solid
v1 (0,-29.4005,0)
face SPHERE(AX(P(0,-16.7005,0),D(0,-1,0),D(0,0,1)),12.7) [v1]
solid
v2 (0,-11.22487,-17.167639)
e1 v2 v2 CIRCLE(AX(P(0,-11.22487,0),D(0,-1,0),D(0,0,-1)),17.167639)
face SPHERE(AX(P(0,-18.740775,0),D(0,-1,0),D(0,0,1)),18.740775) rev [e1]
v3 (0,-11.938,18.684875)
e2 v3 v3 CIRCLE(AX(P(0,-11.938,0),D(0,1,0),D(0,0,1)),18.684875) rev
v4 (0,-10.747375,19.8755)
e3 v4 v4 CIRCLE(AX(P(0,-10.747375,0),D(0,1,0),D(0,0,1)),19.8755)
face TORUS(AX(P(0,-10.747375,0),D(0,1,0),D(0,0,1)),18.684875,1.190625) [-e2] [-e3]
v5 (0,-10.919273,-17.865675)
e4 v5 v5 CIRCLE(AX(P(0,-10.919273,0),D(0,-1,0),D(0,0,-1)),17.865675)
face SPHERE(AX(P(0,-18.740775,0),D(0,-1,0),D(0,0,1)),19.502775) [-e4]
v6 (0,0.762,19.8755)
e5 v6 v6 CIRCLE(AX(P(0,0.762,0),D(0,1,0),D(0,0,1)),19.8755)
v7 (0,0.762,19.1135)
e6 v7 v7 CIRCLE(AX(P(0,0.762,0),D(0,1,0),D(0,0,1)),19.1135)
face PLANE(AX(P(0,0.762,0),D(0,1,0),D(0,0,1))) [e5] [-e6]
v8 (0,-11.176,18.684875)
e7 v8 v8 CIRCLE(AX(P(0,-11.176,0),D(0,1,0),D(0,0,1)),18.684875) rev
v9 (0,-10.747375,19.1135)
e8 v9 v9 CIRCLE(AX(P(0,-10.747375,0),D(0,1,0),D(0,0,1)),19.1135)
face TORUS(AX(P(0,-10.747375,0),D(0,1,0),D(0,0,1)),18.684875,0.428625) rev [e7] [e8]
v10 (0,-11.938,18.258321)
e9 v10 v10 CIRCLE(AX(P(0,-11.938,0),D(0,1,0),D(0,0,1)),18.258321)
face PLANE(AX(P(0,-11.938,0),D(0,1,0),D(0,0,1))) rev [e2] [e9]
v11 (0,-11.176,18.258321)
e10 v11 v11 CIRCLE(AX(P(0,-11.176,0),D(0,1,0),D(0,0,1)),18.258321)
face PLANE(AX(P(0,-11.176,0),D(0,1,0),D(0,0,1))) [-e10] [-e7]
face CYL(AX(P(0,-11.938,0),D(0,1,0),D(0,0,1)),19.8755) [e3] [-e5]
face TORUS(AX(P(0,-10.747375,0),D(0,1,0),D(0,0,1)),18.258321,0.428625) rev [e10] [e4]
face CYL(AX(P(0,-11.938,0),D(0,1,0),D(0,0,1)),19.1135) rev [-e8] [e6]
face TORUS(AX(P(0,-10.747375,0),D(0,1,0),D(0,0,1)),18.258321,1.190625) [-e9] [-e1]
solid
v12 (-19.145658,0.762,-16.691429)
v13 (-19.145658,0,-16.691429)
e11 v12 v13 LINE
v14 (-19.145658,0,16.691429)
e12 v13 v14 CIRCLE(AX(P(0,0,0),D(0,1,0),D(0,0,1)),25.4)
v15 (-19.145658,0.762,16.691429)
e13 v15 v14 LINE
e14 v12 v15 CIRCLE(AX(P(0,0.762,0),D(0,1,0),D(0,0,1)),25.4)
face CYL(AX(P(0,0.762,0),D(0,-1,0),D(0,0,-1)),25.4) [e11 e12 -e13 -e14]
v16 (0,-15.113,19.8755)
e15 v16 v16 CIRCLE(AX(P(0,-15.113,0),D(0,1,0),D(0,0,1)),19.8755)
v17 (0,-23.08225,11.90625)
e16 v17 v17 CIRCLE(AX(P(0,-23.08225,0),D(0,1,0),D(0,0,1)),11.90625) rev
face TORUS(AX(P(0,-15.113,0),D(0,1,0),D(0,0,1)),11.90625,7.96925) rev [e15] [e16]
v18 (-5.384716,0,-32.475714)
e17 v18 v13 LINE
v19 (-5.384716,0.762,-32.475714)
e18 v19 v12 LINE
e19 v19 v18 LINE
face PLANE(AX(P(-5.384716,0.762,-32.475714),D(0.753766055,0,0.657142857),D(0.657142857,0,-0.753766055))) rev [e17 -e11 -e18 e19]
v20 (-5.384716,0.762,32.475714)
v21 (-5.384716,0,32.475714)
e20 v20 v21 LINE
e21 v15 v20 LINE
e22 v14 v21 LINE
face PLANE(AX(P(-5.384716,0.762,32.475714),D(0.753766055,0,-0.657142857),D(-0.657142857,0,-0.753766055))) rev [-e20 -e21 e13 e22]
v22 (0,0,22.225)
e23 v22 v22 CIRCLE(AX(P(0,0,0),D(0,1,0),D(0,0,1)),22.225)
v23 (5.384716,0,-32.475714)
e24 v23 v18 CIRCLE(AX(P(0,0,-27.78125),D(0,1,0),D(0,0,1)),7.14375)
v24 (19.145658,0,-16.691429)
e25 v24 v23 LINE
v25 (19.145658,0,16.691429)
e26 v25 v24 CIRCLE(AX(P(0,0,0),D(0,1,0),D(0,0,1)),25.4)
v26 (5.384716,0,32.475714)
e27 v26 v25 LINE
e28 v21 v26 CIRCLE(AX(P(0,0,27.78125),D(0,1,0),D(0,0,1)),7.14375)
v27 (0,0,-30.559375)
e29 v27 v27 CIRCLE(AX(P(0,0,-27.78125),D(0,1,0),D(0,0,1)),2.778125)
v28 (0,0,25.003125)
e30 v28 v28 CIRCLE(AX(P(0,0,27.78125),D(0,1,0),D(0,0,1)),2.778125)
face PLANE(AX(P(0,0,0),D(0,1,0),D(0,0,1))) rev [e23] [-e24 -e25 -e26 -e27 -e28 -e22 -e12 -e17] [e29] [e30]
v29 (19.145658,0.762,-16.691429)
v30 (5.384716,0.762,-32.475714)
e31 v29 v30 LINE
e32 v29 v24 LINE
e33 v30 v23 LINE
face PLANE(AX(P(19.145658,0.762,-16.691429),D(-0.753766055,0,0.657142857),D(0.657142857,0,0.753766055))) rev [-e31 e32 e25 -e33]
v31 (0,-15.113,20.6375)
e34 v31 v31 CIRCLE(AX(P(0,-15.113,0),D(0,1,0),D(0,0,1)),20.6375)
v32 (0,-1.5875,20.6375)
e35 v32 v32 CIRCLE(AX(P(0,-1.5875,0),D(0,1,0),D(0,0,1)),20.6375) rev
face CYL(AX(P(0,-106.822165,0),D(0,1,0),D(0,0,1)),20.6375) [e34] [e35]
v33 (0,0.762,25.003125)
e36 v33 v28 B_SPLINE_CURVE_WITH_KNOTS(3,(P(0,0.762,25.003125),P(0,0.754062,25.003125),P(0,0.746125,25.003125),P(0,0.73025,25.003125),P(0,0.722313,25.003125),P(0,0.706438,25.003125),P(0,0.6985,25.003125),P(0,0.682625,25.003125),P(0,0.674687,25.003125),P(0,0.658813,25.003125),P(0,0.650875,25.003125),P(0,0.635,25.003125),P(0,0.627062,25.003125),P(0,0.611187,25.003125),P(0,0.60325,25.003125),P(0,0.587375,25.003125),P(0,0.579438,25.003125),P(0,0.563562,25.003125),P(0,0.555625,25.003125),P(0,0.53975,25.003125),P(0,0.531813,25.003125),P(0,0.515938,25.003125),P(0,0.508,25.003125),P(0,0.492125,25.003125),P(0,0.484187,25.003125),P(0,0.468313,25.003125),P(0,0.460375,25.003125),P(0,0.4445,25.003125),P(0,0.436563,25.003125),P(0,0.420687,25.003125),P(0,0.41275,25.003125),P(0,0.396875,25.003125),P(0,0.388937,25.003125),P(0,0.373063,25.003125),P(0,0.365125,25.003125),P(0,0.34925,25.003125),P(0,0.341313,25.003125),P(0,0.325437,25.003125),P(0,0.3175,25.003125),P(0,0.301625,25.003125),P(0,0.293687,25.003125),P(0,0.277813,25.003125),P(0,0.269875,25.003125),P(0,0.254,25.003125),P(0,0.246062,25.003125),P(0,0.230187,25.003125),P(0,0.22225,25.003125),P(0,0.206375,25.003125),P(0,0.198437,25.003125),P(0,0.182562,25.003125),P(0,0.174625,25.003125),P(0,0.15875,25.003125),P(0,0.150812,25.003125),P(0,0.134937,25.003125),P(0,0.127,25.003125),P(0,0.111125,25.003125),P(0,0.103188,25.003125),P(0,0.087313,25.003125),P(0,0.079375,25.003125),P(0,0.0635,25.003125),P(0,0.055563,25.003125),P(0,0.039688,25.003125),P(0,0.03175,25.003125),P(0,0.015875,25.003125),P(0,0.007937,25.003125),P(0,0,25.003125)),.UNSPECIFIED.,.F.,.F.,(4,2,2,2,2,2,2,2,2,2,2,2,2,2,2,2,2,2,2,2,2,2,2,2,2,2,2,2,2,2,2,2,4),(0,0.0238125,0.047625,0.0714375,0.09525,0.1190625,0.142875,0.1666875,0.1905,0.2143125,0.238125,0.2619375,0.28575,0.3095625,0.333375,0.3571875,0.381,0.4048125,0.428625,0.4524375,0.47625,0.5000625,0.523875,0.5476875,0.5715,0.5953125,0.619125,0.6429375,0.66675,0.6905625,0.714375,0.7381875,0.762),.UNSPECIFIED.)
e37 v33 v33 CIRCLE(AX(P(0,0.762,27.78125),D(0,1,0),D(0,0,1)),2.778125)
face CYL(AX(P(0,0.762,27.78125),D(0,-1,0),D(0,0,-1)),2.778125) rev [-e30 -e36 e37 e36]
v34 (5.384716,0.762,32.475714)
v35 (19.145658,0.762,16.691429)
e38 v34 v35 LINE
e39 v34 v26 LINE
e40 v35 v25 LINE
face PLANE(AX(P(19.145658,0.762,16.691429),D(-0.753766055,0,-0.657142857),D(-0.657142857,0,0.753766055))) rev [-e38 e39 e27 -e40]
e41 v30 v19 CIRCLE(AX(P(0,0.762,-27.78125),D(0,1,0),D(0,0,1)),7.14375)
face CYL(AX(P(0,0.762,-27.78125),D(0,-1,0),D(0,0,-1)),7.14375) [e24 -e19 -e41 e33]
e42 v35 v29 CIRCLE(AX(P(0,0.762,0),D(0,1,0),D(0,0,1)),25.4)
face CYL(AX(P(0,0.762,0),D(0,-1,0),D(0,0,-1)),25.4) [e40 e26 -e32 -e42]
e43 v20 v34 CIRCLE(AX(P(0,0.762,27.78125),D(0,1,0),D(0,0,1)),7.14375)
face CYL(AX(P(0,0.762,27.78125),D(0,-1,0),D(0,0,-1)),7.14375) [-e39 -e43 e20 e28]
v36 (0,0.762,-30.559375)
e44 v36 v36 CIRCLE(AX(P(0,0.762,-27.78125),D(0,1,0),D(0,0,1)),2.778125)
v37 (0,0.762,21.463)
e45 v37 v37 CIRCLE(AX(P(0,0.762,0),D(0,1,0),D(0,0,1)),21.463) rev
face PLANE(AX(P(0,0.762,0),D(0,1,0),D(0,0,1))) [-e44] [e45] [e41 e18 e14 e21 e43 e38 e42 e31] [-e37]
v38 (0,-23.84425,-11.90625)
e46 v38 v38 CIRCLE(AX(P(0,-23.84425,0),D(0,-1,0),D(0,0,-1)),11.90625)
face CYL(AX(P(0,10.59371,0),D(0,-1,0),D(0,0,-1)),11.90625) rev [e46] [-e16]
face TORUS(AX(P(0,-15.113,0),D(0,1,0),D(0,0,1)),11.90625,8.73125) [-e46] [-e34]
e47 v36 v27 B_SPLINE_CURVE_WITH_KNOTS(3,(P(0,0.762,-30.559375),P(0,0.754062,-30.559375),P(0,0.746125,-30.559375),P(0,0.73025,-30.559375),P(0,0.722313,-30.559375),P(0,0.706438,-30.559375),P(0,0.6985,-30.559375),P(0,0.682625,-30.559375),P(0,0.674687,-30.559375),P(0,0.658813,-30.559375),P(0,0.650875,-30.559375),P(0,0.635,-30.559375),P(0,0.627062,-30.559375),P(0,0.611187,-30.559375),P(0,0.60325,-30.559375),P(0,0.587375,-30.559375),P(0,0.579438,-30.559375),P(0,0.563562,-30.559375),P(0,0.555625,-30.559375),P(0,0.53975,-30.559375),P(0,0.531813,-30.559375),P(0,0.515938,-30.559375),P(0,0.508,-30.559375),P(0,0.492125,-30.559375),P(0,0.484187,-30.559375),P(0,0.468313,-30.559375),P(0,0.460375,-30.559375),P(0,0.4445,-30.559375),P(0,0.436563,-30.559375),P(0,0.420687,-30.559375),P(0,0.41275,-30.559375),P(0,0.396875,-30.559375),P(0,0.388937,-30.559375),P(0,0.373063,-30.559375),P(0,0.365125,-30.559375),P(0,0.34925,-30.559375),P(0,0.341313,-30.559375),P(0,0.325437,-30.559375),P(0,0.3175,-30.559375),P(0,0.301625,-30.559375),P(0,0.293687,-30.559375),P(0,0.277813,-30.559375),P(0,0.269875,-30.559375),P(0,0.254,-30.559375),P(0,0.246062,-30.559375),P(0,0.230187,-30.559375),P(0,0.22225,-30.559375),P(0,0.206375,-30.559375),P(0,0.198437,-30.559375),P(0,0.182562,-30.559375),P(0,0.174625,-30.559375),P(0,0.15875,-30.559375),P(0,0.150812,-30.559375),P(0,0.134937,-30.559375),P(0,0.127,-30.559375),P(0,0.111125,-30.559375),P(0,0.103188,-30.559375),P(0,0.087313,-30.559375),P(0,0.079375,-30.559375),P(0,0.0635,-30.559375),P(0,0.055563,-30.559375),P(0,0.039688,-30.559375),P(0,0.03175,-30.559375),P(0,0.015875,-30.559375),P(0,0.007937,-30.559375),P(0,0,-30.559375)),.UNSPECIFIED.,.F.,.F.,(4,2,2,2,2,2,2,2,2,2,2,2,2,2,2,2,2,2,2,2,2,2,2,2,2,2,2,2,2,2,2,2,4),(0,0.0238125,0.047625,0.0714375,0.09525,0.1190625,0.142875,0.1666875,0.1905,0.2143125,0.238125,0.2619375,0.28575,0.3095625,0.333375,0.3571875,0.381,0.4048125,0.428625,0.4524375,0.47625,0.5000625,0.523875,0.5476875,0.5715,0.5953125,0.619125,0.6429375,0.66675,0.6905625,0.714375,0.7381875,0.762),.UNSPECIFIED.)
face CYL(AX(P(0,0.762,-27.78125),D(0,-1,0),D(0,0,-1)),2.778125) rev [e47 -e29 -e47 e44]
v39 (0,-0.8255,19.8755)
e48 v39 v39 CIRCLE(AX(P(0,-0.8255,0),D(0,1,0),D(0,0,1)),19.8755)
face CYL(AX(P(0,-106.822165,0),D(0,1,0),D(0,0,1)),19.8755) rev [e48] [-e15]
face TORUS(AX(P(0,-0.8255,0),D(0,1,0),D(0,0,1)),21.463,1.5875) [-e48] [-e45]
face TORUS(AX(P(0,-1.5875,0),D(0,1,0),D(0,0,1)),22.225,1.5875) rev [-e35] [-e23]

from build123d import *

# Parameters (mm, degrees)
SKETCH1_R           = 2.778125
BOSS_EXTRUDE1_DEPTH = 0.762
SKETCH2_R           = 20.6375
BOSS_EXTRUDE2_DEPTH = 23.84425
FILLET1_R           = 8.73125
FILLET2_R           = 1.5875
SKETCH6_R           = 11.90625
CUT_EXTRUDE3_DEPTH  = 0.762
SKETCH7_R           = 19.8755
BOSS_EXTRUDE3_DEPTH = 12.7
FILLET3_R           = 1.190625
SHELL2_T            = -0.762


# Read off the part's stored shape, not the designer's step: Shell1
with BuildPart() as part:
    # Sketch1 → Boss-Extrude1 (new body)
    with BuildSketch(Plane(origin=(0, 0, 0), x_dir=(1, 0, 0), z_dir=(0, 1, 0))):
        with BuildLine():
            Line((19.145657791, -16.691428571), (5.384716254, -32.475714286))
            ThreePointArc((5.384716254, -32.475714286), (0, -34.925), (-5.384716254, -32.475714286))
            Line((-5.384716254, -32.475714286), (-19.145657791, -16.691428571))
            ThreePointArc((-19.145657791, -16.691428571), (-25.4, 0), (-19.145657791, 16.691428571))
            Line((-19.145657791, 16.691428571), (-5.384716254, 32.475714286))
            ThreePointArc((-5.384716254, 32.475714286), (0, 34.925), (5.384716254, 32.475714286))
            Line((5.384716254, 32.475714286), (19.145657791, 16.691428571))
            ThreePointArc((19.145657791, 16.691428571), (25.4, 0), (19.145657791, -16.691428571))
        make_face()
        with Locations(Location((0, 27.78125, 0), (0, 0, 90))):
            Circle(SKETCH1_R, mode=Mode.SUBTRACT)
        with Locations(Location((0, -27.78125, 0), (0, 0, 90))):
            Circle(SKETCH1_R, mode=Mode.SUBTRACT)
    extrude(amount=BOSS_EXTRUDE1_DEPTH)

    # Sketch2 → Boss-Extrude2 (add)
    with BuildSketch(Plane.XZ):
        with Locations(Location((0, 0, 0), (0, 0, 90))):
            Circle(SKETCH2_R)
    extrude(amount=BOSS_EXTRUDE2_DEPTH)

    # Fillet1
    fillet1_edges = [part.edges().sort_by_distance(p)[0] for p in [
        (0, -23.84425, -20.6375),
    ]]
    fillet(fillet1_edges, radius=FILLET1_R)

    # Shell1 outline → Shell1 (revolve, cut)
    with BuildSketch(Plane.XY):
        with BuildLine():
            ThreePointArc((11.90625, -23.08225), (17.541360716, -20.748110716), (19.8755, -15.113))
            Line((19.8755, -15.113), (19.8755, 0.762))
            Line((19.8755, 0.762), (0, 0.762))
            Line((0, 0.762), (0, -23.08225))
            Line((0, -23.08225), (11.90625, -23.08225))
        make_face()
    revolve(axis=Axis((0, 0, 0), (0, 1, 0)), mode=Mode.SUBTRACT)

    # Fillet2
    fillet2_edges = [part.edges().sort_by_distance(p)[0] for p in [
        (0, 0, -20.6375),
        (-19.8755, 0.762, 0),
    ]]
    fillet(fillet2_edges, radius=FILLET2_R)

    # Sketch6 → Cut-Extrude3 (cut)
    with BuildSketch(Plane.XZ.offset(23.84425)):
        with Locations(Location((0, 0, 0), (0, 0, 90))):
            Circle(SKETCH6_R)
    extrude(amount=-CUT_EXTRUDE3_DEPTH, mode=Mode.SUBTRACT)


with BuildPart() as body_2:
    # Sketch7 → Boss-Extrude3 (new body)
    with BuildSketch(Plane(origin=(0, 0.762, 0), x_dir=(1, 0, 0), z_dir=(0, 1, 0))):
        with Locations(Location((0, 0, 0), (0, 0, 270))):
            Circle(SKETCH7_R)
    extrude(amount=-BOSS_EXTRUDE3_DEPTH)

    # Sketch8 → Cut-Revolve1 (revolve, cut)
    with BuildSketch(Plane(origin=(0, 0, 0), x_dir=(0, 0, -1), z_dir=(1, 0, 0))):
        with BuildLine():
            Line((0, 0), (0, -11.938))
            Line((0, -11.938), (-17.4625, -11.938))
            ThreePointArc((-17.4625, -11.938), (-10.576563126, -3.269738778), (0, 0))
        make_face()
    revolve(axis=Axis((0, -0.0381, 0), (0, 1, 0)), mode=Mode.SUBTRACT)

    # Fillet3
    fillet3_edges = [body_2.edges().sort_by_distance(p)[0] for p in [
        (0, -11.938, -19.8755),
        (0, -11.938, -17.4625),
    ]]
    fillet(fillet3_edges, radius=FILLET3_R)

    # Shell2
    shell2_openings = [body_2.faces().sort_by_distance(p)[0] for p in [
        (0, 0.762, 0),
    ]]
    offset(amount=SHELL2_T, openings=shell2_openings, kind=Kind.INTERSECTION)


with BuildPart() as body_3:
    # Sketch3 → Revolve1 (revolve)
    with BuildSketch(Plane(origin=(0, 0, 0), x_dir=(0, 0, -1), z_dir=(1, 0, 0))):
        with BuildLine():
            Line((0, -29.4005), (0, -4.0005))
            ThreePointArc((0, -4.0005), (-12.7, -16.7005), (0, -29.4005))
        make_face()
    revolve(axis=Axis((0, -106.822164787, 0), (0, 1, 0)))


solid = Compound([part.part, body_2.part, body_3.part])
